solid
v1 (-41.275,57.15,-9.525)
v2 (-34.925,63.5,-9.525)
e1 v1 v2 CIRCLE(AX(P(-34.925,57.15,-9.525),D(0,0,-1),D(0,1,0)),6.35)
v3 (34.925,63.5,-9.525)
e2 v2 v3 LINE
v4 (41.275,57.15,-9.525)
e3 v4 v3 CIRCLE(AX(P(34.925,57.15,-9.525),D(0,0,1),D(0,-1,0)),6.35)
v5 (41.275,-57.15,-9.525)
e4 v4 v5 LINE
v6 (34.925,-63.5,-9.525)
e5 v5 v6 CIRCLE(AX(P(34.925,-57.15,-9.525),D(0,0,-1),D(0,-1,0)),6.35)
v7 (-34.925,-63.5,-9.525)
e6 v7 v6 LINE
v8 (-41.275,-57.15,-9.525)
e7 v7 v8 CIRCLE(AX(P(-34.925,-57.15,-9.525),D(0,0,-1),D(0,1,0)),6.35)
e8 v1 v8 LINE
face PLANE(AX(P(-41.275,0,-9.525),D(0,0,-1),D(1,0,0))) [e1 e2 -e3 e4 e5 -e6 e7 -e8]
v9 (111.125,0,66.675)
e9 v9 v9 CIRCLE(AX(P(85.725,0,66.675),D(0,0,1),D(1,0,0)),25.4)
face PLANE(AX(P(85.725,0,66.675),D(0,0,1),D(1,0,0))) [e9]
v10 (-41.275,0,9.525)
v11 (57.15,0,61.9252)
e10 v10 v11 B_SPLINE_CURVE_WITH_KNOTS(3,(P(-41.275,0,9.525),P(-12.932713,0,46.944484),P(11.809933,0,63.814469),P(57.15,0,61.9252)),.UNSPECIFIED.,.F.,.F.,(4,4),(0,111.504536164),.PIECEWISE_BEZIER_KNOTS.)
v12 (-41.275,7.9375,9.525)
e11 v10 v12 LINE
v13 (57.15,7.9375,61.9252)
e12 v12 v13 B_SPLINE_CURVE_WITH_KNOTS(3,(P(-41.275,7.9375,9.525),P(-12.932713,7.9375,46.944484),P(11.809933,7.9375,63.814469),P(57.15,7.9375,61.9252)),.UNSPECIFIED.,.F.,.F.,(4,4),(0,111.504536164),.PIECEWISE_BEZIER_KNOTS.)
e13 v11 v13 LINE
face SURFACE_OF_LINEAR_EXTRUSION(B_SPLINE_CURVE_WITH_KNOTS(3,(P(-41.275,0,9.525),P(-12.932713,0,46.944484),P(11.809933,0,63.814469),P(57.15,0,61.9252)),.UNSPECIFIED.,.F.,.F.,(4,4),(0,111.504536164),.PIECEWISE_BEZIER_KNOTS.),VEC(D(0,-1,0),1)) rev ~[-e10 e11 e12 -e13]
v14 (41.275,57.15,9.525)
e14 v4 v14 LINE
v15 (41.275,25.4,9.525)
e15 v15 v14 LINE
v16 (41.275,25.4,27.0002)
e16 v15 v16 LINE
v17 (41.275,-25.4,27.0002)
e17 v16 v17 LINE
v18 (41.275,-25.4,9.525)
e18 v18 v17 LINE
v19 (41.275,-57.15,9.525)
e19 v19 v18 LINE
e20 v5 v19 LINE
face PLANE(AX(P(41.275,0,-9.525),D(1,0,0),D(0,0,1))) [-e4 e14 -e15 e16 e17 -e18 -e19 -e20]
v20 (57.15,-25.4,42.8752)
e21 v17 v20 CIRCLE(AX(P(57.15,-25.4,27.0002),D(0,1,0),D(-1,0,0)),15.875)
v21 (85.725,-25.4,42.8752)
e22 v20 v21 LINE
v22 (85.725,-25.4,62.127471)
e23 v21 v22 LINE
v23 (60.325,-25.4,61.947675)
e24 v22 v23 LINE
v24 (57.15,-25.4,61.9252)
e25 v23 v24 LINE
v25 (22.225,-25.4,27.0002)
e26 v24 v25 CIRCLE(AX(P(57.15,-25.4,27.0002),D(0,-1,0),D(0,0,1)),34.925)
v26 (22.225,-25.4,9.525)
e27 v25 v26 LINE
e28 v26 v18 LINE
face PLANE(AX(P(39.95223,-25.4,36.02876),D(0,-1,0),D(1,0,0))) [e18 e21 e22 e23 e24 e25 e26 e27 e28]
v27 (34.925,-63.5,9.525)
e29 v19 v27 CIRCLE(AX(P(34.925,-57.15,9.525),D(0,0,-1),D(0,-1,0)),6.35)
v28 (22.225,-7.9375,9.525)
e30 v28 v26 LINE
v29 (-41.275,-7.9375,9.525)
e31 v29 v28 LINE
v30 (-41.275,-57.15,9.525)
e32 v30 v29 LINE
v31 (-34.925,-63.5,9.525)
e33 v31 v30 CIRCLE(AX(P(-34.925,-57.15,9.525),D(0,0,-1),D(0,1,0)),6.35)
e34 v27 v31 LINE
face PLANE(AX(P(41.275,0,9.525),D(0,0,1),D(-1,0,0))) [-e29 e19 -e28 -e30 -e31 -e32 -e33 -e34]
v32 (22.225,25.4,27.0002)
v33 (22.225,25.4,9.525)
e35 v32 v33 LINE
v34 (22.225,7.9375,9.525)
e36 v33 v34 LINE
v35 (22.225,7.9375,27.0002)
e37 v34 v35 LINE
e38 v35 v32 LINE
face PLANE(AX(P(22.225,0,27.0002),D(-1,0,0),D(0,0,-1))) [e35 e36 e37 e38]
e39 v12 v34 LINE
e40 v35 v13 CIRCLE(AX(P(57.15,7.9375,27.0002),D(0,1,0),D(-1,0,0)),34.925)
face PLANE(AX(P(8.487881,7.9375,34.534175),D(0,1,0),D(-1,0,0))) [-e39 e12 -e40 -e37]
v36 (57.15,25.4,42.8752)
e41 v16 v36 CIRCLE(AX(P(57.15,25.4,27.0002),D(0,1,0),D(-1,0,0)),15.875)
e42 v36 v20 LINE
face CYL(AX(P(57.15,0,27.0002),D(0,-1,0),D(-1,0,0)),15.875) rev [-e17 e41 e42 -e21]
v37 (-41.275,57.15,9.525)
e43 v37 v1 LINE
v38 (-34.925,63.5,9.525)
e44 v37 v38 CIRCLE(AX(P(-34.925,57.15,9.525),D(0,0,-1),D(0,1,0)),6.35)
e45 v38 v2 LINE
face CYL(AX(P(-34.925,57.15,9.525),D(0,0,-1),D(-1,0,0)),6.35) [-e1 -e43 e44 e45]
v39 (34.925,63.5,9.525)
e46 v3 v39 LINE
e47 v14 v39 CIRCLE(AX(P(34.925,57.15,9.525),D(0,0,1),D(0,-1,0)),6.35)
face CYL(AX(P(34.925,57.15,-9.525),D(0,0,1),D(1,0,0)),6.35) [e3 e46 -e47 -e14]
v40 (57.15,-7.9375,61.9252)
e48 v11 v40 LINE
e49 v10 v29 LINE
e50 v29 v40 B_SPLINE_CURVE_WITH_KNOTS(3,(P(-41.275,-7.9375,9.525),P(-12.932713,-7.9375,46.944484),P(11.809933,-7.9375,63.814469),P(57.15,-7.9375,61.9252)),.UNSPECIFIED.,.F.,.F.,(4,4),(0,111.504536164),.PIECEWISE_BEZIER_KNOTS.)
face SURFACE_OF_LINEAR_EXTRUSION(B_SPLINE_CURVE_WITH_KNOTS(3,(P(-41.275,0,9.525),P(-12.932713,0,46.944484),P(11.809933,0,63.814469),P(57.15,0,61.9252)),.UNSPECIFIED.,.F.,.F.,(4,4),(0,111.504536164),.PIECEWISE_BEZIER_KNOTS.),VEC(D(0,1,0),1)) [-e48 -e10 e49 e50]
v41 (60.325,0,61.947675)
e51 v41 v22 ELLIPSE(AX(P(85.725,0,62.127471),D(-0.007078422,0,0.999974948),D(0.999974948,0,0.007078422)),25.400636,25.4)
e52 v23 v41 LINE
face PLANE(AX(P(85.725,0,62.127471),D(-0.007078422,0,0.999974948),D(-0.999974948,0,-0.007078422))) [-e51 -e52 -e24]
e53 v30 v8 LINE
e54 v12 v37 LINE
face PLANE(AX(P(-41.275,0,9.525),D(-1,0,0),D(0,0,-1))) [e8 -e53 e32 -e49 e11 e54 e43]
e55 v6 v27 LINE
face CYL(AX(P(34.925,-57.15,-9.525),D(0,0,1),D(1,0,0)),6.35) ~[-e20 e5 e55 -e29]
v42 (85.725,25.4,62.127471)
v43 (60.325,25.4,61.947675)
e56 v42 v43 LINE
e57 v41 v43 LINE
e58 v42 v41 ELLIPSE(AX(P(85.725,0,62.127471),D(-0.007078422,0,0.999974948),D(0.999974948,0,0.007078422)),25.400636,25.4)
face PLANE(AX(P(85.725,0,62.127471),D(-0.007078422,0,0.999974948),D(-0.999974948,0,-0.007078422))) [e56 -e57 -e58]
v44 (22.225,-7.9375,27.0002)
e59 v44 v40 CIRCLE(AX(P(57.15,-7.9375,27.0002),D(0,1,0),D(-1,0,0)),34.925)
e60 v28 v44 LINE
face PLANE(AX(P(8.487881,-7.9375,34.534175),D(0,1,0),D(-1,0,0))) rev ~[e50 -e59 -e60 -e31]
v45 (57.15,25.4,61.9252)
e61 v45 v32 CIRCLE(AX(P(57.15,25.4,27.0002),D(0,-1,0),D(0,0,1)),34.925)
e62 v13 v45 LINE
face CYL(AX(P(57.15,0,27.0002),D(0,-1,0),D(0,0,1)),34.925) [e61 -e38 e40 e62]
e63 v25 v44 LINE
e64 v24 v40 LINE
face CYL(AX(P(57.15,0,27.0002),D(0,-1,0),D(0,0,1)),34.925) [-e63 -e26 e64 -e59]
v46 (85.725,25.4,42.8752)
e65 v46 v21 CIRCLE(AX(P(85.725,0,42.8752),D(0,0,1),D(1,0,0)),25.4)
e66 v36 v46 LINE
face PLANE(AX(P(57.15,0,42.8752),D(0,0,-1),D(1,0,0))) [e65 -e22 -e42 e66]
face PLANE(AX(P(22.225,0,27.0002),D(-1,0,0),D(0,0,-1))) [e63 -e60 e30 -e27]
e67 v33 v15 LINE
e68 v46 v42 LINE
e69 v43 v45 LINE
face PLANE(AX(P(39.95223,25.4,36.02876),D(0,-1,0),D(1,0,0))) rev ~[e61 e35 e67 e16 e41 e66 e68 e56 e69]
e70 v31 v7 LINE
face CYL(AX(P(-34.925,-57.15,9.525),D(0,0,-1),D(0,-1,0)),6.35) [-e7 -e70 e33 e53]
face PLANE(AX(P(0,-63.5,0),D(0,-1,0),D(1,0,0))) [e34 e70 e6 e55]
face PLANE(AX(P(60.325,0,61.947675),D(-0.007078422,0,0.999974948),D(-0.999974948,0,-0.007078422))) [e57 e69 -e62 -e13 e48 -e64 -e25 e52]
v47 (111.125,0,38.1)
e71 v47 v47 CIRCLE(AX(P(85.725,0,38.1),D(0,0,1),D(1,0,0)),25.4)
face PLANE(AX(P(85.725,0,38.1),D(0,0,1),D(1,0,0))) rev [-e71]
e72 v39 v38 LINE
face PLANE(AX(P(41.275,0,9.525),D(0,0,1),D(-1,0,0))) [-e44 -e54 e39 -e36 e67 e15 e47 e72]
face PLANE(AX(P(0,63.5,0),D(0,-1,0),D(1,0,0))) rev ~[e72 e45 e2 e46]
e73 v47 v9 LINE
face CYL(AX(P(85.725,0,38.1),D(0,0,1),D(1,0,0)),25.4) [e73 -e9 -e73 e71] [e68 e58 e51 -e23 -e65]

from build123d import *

# Parameters (mm, degrees)
F1_DEPTH = 63.5
F2_DEPTH = 25.4
F3_DEPTH = 7.9375
F0_W     = 25.4
F0_H     = 4.7752
F5_R     = 6.35


with BuildPart() as f1:
    # F0 (on Front) → F1 (new body, symmetric)
    with BuildSketch(Plane.XZ):
        Polygon((22.225, 9.525), (-41.275, 9.525), (-41.275, -9.525), (41.275, -9.525), (41.275, 9.525), align=None)
    extrude(amount=F1_DEPTH, both=True)

    # F0 (on Front) → F2 (join, symmetric)
    with BuildSketch(Plane.XZ):
        with BuildLine():
            Line((22.225, 27.0002), (22.225, 9.525))
            Line((22.225, 9.525), (41.275, 9.525))
            Line((41.275, 9.525), (41.275, 27.0002))
            ThreePointArc((41.275, 27.0002), (45.9246798487, 38.2255201513), (57.15, 42.8752))
            Line((57.15, 42.8752), (60.325, 42.8752))
            Line((60.325, 42.8752), (60.325, 61.9476745522))
            Line((60.325, 61.9476745522), (57.15, 61.9252))
            ThreePointArc((57.15, 61.9252), (32.4542956671, 51.6959043329), (22.225, 27.0002))
        make_face()
        Polygon((85.725, 62.1274709702), (60.325, 61.9476745522), (60.325, 42.8752), (85.725, 42.8752), align=None)
    extrude(amount=F2_DEPTH, both=True)

    # F0 (on Front) → F3 (join, symmetric)
    with BuildSketch(Plane.XZ):
        with BuildLine():
            add(Edge.make_bspline(
                [(-41.275, 9.525), (-12.9327131435, 46.9444841146), (11.8099329993, 63.8144686818), (57.15, 61.9252)],
                knots=[0, 0, 0, 0, 111.5045361635, 111.5045361635, 111.5045361635, 111.5045361635], degree=3))
            Line((-41.275, 9.525), (22.225, 9.525))
            Line((22.225, 9.525), (22.225, 27.0002))
            ThreePointArc((22.225, 27.0002), (32.4542956671, 51.6959043329), (57.15, 61.9252))
        make_face()
    extrude(amount=F3_DEPTH, both=True)

    # F0 (on Front) → F4 (revolve)
    with BuildSketch(Plane.XZ):
        Polygon((85.725, 66.675), (85.725, 62.1274709702), (85.725, 42.8752), (111.125, 42.8752), (111.125, 66.675), align=None)
        with Locations((98.425, 40.4876)):
            Rectangle(F0_W, F0_H)
    revolve(axis=Axis((85.725, 0, 52.3875), (0, 0, 1)))

    # F5
    f5_edges = [f1.edges().sort_by_distance(p)[0] for p in [
        (-41.275, -63.5, 0),
        (41.275, -63.5, 0),
        (41.275, 63.5, 0),
        (-41.275, 63.5, 0),
    ]]
    fillet(f5_edges, radius=F5_R)


solid = f1.part
